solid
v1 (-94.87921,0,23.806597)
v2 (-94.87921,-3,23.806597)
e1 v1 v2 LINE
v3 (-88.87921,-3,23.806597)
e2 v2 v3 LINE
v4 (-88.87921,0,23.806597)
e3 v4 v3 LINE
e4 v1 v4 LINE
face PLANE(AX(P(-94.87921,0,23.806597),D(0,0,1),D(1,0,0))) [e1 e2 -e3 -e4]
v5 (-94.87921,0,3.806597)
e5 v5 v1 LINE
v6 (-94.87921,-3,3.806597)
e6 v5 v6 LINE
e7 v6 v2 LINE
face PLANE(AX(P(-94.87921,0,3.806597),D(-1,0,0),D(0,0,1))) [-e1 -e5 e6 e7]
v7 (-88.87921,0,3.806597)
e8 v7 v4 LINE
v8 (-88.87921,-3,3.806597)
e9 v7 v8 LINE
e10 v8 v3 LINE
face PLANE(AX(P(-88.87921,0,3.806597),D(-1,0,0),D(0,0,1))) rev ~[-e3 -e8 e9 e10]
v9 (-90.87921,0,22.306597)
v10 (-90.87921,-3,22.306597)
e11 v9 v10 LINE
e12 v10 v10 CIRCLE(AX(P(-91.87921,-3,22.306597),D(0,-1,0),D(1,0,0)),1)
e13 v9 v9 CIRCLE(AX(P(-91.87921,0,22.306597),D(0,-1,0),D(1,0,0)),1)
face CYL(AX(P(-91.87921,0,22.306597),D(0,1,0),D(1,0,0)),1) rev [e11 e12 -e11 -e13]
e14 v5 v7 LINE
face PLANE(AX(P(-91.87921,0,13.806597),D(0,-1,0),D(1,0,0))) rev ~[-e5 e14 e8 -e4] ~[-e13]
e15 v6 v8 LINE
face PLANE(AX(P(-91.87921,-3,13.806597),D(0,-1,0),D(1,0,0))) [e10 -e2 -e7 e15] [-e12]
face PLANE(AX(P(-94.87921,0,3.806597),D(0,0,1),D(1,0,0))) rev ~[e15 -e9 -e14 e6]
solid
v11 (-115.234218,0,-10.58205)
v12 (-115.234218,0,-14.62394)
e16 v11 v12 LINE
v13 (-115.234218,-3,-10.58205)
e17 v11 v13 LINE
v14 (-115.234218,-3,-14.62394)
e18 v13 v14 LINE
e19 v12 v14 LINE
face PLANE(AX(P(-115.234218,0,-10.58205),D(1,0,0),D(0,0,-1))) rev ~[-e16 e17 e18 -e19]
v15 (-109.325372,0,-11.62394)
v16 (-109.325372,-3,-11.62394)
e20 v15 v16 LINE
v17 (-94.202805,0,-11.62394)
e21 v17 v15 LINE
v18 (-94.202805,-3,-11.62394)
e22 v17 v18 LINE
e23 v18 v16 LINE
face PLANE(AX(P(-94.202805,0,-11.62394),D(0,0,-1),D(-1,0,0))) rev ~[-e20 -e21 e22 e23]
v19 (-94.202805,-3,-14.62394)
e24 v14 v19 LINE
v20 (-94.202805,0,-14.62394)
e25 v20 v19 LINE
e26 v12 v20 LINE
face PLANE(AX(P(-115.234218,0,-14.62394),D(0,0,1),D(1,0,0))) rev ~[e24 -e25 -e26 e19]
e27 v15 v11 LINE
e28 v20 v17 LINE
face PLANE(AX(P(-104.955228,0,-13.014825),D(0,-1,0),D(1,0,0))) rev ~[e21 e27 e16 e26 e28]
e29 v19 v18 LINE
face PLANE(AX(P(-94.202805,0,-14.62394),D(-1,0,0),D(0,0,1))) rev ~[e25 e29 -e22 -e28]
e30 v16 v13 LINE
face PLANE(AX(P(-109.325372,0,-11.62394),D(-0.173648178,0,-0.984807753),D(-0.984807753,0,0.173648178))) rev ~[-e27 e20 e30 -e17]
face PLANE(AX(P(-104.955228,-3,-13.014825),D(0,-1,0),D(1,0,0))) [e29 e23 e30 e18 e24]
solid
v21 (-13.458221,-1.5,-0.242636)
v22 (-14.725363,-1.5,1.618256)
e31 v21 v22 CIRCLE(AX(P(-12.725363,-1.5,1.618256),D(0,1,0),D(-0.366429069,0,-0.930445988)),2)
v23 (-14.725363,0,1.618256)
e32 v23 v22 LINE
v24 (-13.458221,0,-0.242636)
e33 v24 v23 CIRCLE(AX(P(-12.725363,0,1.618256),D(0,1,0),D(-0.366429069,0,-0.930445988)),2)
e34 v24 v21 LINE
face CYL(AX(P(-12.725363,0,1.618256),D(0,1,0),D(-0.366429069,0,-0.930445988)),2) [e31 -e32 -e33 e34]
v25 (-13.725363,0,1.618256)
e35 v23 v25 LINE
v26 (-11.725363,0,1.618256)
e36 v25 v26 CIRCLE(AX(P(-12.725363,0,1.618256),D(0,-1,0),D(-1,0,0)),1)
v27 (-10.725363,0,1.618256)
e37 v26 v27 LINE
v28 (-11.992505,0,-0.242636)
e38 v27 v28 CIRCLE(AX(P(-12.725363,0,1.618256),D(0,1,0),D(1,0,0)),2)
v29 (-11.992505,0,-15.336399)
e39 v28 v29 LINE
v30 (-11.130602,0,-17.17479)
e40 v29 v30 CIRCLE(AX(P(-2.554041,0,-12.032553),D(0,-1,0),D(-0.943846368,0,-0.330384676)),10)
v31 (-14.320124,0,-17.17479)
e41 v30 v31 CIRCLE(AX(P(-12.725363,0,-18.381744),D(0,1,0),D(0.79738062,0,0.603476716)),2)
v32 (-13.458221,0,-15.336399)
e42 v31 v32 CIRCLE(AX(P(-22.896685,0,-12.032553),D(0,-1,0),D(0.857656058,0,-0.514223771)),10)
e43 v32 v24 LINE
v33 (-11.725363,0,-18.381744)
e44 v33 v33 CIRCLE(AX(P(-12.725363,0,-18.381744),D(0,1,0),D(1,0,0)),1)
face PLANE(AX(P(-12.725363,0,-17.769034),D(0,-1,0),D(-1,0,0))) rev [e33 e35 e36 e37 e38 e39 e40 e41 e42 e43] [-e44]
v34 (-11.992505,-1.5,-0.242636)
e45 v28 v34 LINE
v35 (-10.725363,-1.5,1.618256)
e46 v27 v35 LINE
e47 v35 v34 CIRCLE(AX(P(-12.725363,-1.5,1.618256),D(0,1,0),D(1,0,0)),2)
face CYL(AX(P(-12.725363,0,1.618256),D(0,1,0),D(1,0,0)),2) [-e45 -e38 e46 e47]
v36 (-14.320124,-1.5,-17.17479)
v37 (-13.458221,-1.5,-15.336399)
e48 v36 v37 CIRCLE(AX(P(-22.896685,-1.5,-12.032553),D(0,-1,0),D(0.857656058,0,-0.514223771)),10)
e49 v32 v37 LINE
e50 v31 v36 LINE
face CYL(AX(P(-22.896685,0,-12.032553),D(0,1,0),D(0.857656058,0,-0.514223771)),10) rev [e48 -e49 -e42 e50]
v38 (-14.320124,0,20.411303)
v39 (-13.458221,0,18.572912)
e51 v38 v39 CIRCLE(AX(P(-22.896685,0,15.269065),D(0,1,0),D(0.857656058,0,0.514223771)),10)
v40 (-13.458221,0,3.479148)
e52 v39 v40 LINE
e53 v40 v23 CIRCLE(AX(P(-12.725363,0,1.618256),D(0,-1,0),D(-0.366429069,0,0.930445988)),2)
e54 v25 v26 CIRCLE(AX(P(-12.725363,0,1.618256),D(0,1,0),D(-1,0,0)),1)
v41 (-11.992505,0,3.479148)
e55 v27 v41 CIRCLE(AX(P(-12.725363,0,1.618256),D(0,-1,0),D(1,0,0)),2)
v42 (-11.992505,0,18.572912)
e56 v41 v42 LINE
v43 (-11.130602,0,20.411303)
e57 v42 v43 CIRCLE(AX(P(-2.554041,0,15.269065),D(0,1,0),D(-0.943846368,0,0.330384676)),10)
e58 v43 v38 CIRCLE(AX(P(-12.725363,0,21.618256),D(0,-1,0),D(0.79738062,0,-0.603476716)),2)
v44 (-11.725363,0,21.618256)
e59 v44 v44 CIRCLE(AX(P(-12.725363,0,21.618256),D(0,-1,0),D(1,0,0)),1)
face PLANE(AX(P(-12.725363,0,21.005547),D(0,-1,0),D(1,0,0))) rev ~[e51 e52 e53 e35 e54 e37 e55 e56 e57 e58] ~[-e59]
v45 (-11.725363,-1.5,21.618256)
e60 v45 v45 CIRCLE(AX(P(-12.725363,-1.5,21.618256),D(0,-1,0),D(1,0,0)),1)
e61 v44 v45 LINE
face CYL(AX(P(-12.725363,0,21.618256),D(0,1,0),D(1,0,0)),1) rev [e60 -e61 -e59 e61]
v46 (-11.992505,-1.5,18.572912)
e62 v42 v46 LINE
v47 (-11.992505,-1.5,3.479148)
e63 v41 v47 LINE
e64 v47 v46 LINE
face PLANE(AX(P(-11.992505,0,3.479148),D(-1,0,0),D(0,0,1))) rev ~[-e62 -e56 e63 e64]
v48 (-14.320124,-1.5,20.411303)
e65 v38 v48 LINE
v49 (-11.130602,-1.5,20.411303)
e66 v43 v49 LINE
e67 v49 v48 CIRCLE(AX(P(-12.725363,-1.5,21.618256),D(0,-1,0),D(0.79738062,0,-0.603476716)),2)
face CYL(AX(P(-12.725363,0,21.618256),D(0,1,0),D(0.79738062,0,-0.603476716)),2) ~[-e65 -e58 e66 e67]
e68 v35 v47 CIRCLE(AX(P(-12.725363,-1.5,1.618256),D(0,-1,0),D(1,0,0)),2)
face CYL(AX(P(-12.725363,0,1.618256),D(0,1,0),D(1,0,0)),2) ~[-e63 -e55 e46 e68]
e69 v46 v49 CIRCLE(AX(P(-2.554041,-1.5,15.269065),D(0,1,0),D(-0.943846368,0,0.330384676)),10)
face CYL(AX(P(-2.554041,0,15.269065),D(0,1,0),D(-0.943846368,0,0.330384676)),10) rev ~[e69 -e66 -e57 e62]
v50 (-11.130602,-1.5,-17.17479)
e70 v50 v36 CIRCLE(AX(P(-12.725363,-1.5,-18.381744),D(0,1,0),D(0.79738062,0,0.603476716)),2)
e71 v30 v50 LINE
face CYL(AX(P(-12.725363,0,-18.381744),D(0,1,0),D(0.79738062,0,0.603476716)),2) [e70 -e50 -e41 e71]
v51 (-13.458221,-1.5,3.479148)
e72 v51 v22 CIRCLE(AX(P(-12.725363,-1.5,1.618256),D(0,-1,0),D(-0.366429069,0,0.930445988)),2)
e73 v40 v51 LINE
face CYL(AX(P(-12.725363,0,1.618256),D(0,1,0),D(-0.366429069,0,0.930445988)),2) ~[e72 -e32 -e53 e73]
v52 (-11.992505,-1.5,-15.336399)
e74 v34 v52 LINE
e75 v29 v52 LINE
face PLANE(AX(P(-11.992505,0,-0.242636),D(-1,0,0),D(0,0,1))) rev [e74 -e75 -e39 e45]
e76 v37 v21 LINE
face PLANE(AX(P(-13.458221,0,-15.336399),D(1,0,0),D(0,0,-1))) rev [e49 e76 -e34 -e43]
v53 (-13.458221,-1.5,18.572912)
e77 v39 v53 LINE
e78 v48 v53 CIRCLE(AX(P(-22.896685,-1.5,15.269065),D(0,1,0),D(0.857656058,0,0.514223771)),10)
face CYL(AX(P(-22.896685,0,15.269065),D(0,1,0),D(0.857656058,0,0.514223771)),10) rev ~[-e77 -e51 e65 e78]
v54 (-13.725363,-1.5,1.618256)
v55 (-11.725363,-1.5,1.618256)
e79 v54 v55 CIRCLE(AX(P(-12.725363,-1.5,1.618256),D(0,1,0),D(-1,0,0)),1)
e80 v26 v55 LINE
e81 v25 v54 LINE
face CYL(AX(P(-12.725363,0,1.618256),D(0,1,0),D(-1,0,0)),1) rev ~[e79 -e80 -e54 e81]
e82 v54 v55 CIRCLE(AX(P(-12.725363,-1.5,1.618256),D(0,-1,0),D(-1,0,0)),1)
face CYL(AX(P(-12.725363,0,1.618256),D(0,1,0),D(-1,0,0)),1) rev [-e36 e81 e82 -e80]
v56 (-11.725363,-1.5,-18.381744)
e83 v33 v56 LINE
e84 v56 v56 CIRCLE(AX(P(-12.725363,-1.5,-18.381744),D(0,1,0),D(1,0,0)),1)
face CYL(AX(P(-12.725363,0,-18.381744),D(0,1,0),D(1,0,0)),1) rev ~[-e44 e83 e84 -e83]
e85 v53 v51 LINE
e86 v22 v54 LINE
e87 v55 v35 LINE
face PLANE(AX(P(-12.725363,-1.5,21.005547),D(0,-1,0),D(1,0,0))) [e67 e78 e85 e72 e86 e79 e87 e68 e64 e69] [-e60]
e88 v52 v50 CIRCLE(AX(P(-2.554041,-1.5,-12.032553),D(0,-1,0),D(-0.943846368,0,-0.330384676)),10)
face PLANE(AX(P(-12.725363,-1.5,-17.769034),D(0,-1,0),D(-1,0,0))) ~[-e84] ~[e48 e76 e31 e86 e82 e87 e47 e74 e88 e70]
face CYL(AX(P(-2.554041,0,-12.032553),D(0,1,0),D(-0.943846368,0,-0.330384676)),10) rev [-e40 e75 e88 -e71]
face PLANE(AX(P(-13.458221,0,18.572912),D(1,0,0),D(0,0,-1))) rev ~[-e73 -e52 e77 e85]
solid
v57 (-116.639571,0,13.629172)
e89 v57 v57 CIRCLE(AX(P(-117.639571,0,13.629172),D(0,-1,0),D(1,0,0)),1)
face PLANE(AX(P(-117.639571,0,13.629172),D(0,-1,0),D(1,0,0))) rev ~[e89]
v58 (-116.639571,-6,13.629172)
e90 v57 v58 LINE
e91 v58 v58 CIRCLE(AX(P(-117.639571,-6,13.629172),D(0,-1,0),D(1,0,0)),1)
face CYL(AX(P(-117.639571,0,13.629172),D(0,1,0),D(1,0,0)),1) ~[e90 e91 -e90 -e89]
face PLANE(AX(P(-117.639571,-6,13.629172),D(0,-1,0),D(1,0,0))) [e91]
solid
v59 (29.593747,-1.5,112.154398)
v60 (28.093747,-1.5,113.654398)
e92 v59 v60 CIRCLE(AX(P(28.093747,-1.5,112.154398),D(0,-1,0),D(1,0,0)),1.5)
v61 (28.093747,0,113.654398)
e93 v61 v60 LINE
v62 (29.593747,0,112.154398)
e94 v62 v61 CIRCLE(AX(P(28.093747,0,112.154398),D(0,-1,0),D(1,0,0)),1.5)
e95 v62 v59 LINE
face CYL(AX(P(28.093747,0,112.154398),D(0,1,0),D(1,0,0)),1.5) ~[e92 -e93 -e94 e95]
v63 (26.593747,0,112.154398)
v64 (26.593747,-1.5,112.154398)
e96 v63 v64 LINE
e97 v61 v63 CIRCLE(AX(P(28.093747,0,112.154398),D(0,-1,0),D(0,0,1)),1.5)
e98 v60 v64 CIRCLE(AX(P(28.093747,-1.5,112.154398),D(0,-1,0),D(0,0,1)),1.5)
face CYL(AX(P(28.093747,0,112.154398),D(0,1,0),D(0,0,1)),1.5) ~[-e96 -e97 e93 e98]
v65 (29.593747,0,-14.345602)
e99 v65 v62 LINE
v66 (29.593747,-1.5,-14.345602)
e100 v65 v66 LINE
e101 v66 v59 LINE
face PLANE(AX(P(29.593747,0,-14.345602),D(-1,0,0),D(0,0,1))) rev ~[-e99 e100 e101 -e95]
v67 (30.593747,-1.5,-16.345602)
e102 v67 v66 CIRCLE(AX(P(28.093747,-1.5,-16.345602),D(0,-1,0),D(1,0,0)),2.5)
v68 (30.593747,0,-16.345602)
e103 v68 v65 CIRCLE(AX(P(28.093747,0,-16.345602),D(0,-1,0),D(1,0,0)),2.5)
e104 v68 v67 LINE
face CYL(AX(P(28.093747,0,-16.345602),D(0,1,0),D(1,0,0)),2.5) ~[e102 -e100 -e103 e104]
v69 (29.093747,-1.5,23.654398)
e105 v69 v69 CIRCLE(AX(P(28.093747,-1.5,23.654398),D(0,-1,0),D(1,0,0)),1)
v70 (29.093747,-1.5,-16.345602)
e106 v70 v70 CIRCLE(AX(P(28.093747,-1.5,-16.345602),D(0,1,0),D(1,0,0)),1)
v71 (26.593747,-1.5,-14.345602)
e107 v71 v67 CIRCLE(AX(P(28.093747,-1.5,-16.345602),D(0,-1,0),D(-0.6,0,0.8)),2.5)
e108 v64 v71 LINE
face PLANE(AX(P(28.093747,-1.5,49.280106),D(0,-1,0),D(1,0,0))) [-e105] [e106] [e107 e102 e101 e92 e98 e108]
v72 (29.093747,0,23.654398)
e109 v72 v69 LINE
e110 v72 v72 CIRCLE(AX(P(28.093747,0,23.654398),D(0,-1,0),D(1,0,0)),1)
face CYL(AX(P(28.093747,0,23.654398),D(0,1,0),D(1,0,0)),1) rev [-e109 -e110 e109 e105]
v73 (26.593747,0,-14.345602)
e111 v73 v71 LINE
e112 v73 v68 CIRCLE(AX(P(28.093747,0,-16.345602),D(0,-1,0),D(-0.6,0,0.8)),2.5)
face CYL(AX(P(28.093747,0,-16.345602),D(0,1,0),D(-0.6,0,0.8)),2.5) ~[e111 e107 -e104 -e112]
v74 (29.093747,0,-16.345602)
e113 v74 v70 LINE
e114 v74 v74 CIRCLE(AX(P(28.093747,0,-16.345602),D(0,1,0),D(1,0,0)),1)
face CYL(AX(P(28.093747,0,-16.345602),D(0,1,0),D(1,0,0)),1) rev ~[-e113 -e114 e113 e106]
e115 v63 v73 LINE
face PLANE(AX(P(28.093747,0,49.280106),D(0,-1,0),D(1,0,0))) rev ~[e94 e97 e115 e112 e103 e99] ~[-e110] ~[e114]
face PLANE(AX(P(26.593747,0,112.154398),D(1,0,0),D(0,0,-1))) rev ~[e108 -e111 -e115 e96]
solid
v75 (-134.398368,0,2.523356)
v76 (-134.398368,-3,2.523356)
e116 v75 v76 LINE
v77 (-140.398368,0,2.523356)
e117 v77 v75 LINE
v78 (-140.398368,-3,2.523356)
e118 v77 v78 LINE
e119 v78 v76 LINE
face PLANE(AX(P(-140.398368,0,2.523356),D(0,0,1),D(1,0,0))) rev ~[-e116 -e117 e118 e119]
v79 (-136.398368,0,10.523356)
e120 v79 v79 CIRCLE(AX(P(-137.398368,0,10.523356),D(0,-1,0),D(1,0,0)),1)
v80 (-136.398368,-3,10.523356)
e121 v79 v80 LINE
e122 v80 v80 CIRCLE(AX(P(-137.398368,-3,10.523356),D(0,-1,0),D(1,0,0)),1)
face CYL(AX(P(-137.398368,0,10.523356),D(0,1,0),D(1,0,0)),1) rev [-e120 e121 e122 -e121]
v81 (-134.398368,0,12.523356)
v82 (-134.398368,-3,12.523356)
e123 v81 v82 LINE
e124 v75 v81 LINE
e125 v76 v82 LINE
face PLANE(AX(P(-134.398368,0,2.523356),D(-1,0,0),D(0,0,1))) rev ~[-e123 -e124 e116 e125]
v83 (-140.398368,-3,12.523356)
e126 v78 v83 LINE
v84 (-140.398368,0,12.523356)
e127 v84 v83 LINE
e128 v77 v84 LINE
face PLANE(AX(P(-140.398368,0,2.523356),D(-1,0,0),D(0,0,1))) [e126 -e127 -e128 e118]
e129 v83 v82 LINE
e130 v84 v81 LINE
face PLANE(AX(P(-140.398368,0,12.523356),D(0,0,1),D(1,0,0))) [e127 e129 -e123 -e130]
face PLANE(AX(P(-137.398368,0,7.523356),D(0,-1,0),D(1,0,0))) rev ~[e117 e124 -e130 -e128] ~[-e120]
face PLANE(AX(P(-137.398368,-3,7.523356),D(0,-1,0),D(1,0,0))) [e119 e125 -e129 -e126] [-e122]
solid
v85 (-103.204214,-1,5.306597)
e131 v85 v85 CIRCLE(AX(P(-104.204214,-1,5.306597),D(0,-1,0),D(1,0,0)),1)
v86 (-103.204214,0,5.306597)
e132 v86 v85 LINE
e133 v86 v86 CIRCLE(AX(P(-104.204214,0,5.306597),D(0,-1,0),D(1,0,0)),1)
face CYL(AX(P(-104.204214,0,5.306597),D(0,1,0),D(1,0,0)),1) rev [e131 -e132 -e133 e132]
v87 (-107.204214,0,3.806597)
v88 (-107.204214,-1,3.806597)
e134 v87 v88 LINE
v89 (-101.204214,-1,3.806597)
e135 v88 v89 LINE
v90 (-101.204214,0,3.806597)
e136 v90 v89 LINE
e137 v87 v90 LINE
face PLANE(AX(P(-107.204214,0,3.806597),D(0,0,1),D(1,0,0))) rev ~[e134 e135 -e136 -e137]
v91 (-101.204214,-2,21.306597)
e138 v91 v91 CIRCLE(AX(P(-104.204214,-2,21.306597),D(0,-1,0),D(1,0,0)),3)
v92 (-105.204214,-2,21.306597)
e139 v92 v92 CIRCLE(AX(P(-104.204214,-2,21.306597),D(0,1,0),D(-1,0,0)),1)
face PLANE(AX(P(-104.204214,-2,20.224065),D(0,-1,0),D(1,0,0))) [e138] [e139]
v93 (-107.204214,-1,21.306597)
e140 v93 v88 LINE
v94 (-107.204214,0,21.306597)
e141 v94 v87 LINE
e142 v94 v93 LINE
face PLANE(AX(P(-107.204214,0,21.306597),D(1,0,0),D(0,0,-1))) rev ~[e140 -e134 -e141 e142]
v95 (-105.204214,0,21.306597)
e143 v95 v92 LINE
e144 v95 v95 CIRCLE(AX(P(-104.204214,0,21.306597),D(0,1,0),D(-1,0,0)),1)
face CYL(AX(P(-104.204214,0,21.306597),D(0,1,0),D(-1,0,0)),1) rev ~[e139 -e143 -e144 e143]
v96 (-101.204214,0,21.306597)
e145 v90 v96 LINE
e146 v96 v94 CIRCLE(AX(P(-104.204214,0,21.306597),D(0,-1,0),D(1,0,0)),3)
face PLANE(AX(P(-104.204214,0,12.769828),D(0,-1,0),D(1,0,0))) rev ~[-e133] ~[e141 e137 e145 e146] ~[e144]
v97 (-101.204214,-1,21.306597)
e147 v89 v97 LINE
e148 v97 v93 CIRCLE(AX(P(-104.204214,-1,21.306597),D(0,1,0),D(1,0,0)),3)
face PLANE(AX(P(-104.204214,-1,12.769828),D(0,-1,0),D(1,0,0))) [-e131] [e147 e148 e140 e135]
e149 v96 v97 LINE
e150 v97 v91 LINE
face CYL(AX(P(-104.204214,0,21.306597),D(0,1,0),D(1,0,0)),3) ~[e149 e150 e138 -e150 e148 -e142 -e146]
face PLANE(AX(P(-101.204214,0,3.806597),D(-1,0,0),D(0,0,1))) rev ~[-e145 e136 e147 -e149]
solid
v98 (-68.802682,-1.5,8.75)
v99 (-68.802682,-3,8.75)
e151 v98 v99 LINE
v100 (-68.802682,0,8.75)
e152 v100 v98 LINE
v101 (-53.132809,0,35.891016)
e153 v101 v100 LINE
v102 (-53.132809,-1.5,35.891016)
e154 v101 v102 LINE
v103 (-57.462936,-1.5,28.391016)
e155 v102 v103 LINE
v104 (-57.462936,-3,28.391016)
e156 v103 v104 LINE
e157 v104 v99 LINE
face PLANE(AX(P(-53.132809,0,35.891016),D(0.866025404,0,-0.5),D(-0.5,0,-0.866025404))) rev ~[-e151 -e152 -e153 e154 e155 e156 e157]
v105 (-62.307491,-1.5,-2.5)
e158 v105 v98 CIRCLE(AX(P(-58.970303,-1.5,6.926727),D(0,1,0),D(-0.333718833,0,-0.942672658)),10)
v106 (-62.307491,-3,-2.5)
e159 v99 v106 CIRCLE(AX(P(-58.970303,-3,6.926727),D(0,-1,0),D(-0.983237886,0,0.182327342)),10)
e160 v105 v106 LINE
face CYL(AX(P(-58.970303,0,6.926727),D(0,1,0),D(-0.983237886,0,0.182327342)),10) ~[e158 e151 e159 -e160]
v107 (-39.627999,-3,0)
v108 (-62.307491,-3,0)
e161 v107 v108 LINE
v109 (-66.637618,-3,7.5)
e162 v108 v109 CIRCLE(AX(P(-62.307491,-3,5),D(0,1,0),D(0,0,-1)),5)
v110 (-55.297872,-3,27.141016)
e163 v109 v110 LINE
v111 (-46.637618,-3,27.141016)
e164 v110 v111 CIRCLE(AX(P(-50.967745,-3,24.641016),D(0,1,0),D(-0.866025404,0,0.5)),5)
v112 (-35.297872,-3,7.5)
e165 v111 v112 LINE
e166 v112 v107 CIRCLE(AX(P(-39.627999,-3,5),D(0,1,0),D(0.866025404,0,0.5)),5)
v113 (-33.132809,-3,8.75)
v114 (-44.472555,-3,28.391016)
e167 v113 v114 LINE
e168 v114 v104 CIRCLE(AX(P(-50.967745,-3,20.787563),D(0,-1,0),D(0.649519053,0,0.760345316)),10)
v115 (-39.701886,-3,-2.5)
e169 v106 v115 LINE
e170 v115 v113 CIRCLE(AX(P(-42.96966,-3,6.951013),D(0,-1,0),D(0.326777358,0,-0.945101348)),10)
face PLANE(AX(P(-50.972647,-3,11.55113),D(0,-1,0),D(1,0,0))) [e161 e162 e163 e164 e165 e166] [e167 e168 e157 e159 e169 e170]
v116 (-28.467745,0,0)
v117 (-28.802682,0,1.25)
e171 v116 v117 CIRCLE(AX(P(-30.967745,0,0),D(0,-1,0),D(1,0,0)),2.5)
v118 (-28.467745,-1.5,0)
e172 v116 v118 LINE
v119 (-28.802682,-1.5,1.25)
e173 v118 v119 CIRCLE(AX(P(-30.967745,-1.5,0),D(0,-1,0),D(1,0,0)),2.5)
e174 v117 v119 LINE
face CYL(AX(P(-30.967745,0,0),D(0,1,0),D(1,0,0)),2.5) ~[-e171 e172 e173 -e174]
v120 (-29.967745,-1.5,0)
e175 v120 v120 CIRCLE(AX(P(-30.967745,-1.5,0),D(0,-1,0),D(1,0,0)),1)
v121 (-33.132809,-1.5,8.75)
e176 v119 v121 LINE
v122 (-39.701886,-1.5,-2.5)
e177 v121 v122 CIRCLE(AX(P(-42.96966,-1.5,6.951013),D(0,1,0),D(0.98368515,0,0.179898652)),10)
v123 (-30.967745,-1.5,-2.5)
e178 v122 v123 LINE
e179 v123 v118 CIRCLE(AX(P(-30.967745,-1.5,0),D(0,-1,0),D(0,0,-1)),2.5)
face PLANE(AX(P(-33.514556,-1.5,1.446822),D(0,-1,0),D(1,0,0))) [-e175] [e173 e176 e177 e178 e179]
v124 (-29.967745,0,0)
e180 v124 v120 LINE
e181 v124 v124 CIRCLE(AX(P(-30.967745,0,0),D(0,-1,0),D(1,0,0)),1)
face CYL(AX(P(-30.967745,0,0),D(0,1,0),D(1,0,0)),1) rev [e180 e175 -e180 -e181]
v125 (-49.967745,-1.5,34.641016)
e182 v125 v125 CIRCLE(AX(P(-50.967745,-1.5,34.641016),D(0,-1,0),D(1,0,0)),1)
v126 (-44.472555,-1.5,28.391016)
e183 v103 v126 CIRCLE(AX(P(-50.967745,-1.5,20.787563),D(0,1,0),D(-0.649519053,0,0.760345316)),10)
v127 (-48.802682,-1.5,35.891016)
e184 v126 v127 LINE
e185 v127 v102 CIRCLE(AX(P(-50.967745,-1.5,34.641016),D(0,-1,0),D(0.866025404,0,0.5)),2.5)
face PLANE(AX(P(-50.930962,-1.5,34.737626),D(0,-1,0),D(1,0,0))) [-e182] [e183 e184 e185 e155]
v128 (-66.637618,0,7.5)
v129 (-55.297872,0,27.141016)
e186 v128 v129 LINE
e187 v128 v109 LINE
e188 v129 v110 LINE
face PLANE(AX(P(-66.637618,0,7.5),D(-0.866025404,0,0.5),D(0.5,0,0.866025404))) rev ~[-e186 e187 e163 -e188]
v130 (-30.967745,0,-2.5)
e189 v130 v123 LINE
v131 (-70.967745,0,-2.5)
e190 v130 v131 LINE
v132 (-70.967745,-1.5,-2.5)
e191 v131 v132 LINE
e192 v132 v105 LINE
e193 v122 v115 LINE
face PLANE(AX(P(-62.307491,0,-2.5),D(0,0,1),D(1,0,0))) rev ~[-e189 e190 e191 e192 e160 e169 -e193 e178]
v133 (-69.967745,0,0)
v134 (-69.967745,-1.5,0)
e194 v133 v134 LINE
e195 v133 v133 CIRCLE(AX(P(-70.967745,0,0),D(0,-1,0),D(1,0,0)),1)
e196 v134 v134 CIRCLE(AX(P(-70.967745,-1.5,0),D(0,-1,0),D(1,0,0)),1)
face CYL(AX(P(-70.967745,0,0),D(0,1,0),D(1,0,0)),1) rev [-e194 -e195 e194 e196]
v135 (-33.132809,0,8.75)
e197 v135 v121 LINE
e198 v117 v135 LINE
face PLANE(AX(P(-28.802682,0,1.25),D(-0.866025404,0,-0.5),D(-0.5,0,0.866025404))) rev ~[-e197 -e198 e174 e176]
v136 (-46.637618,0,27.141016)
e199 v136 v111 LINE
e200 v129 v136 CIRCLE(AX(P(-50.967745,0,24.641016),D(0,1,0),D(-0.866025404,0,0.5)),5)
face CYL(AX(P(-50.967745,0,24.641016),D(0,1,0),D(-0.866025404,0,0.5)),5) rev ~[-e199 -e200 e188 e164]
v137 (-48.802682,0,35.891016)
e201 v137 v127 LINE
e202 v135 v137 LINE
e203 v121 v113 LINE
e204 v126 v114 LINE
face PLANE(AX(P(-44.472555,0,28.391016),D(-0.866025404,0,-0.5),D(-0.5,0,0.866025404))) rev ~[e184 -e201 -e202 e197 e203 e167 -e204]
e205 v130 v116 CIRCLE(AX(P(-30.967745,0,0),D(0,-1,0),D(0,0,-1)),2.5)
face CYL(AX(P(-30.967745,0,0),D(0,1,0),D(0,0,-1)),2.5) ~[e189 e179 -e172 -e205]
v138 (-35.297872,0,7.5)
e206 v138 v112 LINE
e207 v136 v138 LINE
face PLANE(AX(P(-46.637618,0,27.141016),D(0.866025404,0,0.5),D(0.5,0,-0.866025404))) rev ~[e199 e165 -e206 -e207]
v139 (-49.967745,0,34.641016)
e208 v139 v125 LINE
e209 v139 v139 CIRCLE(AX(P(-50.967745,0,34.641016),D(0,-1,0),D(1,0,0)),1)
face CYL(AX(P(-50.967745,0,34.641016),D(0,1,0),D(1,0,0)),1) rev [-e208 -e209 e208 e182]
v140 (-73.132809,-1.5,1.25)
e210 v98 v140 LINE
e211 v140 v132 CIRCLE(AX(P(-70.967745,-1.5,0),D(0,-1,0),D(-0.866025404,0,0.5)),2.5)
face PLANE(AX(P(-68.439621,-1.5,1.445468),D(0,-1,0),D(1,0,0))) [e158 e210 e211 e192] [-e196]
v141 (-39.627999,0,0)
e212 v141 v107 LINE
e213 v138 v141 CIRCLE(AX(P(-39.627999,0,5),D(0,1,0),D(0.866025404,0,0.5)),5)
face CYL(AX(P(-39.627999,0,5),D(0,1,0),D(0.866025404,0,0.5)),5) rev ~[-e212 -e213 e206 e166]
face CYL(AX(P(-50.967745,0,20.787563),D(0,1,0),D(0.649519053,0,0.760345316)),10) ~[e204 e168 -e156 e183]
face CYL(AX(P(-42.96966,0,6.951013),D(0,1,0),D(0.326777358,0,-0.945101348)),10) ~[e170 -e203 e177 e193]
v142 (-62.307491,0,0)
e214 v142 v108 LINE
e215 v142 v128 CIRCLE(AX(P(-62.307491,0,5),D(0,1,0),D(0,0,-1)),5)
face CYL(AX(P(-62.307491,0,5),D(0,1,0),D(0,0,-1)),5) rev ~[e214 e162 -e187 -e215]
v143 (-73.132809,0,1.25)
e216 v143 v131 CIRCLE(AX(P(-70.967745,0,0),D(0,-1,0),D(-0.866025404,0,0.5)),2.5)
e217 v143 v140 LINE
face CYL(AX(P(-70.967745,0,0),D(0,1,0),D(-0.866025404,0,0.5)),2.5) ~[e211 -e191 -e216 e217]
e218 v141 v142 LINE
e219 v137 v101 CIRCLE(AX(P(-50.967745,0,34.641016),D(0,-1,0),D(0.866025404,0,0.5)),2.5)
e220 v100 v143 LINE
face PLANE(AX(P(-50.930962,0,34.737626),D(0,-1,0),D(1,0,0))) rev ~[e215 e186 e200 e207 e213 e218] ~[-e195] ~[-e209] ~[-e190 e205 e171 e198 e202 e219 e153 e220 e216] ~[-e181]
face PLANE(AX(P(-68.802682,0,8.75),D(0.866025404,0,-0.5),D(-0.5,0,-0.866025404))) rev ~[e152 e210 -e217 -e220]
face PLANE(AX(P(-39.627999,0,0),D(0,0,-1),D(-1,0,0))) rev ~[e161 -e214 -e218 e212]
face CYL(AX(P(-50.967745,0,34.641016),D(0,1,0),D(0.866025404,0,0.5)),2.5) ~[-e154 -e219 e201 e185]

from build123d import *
from build123d import SkipClean  # not in build123d's __all__

# Parameters (mm, degrees)
F1_DEPTH  = 3
F0_R      = 1
F2_DEPTH  = 1.5
F4_DEPTH  = 1.5
F3_R      = 1
F5_DEPTH  = 1.5
F7_W      = 6
F7_H      = 20
F7_R      = 1
F8_DEPTH  = 3
F9_DEPTH  = 6
F10_DEPTH = 2
F11_DEPTH = 1
F12_R     = 1
F13_DEPTH = 1.5
F7_H_2    = 10
F14_DEPTH = 3
F16_DEPTH = 3


with BuildPart() as f1:
    # F0 (on Front) → F1 (new body)
    with BuildSketch(Plane.XZ):
        with BuildLine():
            Line((-33.1328085528, 8.75), (-44.4725545149, 28.3910161514))
            ThreePointArc((-44.4725545149, 28.3910161514), (-50.9677450433, 30.7875629885), (-57.4629355717, 28.3910161514))
            Line((-57.4629355717, 28.3910161514), (-68.8026815338, 8.75))
            ThreePointArc((-68.8026815338, 8.75), (-67.630556712, 1.9267265814), (-62.3074910055, -2.5))
            Line((-62.3074910055, -2.5), (-39.7018864751, -2.5))
            ThreePointArc((-39.7018864751, -2.5), (-34.3340694771, 1.9085363771), (-33.1328085528, 8.75))
        make_face()
        with BuildLine():
            Line((-39.6279990812, 0), (-62.3074910055, 0))
            ThreePointArc((-62.3074910055, 0), (-66.6376180244, 2.5), (-66.6376180244, 7.5))
            Line((-66.6376180244, 7.5), (-55.2978720622, 27.1410161514))
            ThreePointArc((-55.2978720622, 27.1410161514), (-50.9677450433, 29.6410161514), (-46.6376180244, 27.1410161514))
            Line((-46.6376180244, 27.1410161514), (-35.2978720622, 7.5))
            ThreePointArc((-35.2978720622, 7.5), (-35.2978720622, 2.5), (-39.6279990812, 0))
        make_face(mode=Mode.SUBTRACT)
    extrude(amount=F1_DEPTH)

    # F0 (on Front) → F2 (join)
    with BuildSketch(Plane.XZ):
        with BuildLine():
            ThreePointArc((-53.1328085528, 35.8910161514), (-51.6147926561, 32.2262015857), (-48.4677450433, 34.6410161514))
            ThreePointArc((-48.4677450433, 34.6410161514), (-48.5529304776, 35.2880637641), (-48.8026815338, 35.8910161514))
            ThreePointArc((-48.8026815338, 35.8910161514), (-50.9677450433, 37.1410161514), (-53.1328085528, 35.8910161514))
        make_face()
        with Locations((-50.9677450433, 34.6410161514)):
            Circle(F0_R, mode=Mode.SUBTRACT)
        with BuildLine():
            ThreePointArc((-48.8026815338, 35.8910161514), (-48.5529304776, 35.2880637641), (-48.4677450433, 34.6410161514))
            ThreePointArc((-48.4677450433, 34.6410161514), (-51.6147926561, 32.2262015857), (-53.1328085528, 35.8910161514))
            Line((-53.1328085528, 35.8910161514), (-57.4629355717, 28.3910161514))
            ThreePointArc((-57.4629355717, 28.3910161514), (-50.9677450433, 30.7875629885), (-44.4725545149, 28.3910161514))
            Line((-44.4725545149, 28.3910161514), (-48.8026815338, 35.8910161514))
        make_face()
        with BuildLine():
            Line((-28.8026815338, 1.25), (-33.1328085528, 8.75))
            ThreePointArc((-33.1328085528, 8.75), (-34.3340694771, 1.9085363771), (-39.7018864751, -2.5))
            Line((-39.7018864751, -2.5), (-30.9677450433, -2.5))
            ThreePointArc((-30.9677450433, -2.5), (-33.1328085528, 1.25), (-28.8026815338, 1.25))
        make_face()
        with BuildLine():
            ThreePointArc((-28.4677450433, 0), (-28.5529304776, 0.6470476128), (-28.8026815338, 1.25))
            ThreePointArc((-28.8026815338, 1.25), (-33.1328085528, 1.25), (-30.9677450433, -2.5))
            ThreePointArc((-30.9677450433, -2.5), (-29.1999780903, -1.767766953), (-28.4677450433, 0))
        make_face()
        with Locations((-30.9677450433, 0)):
            Circle(F0_R, mode=Mode.SUBTRACT)
        with BuildLine():
            ThreePointArc((-62.3074910055, -2.5), (-67.630556712, 1.9267265814), (-68.8026815338, 8.75))
            Line((-68.8026815338, 8.75), (-73.1328085528, 1.25))
            ThreePointArc((-73.1328085528, 1.25), (-70.3206974306, 2.4148145657), (-68.4677450433, 0))
            ThreePointArc((-68.4677450433, 0), (-69.1999780903, -1.767766953), (-70.9677450433, -2.5))
            Line((-70.9677450433, -2.5), (-62.3074910055, -2.5))
        make_face()
        with BuildLine():
            ThreePointArc((-68.4677450433, 0), (-70.3206974306, 2.4148145657), (-73.1328085528, 1.25))
            ThreePointArc((-73.1328085528, 1.25), (-73.1328085528, -1.25), (-70.9677450433, -2.5))
            ThreePointArc((-70.9677450433, -2.5), (-69.1999780903, -1.767766953), (-68.4677450433, 0))
        make_face()
        with Locations((-70.9677450433, 0)):
            Circle(F0_R, mode=Mode.SUBTRACT)
    extrude(amount=F2_DEPTH)


with BuildPart() as f4:
    # F3 (on Front) → F4 (new body)
    with BuildSketch(Plane.XZ):
        with BuildLine():
            Line((-11.9925050726, 18.5729119312), (-13.4582213502, 18.5729119312))
            Line((-13.4582213502, 18.5729119312), (-13.4582213502, 3.4791482928))
            ThreePointArc((-13.4582213502, 3.4791482928), (-14.3784990615, 2.7439302749), (-14.7253632114, 1.6182563162))
            Line((-14.7253632114, 1.6182563162), (-13.7253632114, 1.6182563162))
            ThreePointArc((-13.7253632114, 1.6182563162), (-12.7253632114, 2.6182563162), (-11.7253632114, 1.6182563162))
            Line((-11.7253632114, 1.6182563162), (-10.7253632114, 1.6182563162))
            ThreePointArc((-10.7253632114, 1.6182563162), (-11.0722273613, 2.7439302749), (-11.9925050726, 3.4791482928))
            Line((-11.9925050726, 3.4791482928), (-11.9925050726, 18.5729119312))
        make_face()
    extrude(amount=F4_DEPTH)

    # F3 (on Front) → F5 (join)
    with BuildSketch(Plane.XZ):
        with BuildLine():
            ThreePointArc((-14.3201244522, 20.4113028852), (-13.8423935019, 19.5140392553), (-13.4582213502, 18.5729119312))
            Line((-13.4582213502, 18.5729119312), (-11.9925050726, 18.5729119312))
            ThreePointArc((-11.9925050726, 18.5729119312), (-11.6083329209, 19.5140392553), (-11.1306019706, 20.4113028852))
            ThreePointArc((-11.1306019706, 20.4113028852), (-12.7253632114, 23.6182563162), (-14.3201244522, 20.4113028852))
        make_face()
        with Locations((-12.7253632114, 21.6182563162)):
            Circle(F3_R, mode=Mode.SUBTRACT)
    extrude(amount=F5_DEPTH)

    # F6: F4 across face


with BuildPart() as f4_1:
    add(f4.part, clean=False)
    with SkipClean():  # cleaning this boolean's faces spoils the solid; the shape is the same uncleaned
        add(f4.part.mirror(Plane(origin=(-14.2253632114, -0.75, 1.6182563162), x_dir=(1, 0, 0), z_dir=(0, 0, -1))), clean=False)


with BuildPart() as f8:
    # F7 (on Front) → F8 (new body)
    with BuildSketch(Plane.XZ):
        with Locations((-91.8792099953, 13.8065970875)):
            Rectangle(F7_W, F7_H)
        with Locations((-91.8792099953, 22.3065970875)):
            Circle(F7_R, mode=Mode.SUBTRACT)
    extrude(amount=F8_DEPTH)


with BuildPart() as f9:
    # F7 (on Front) → F9 (new body)
    with BuildSketch(Plane.XZ):
        with Locations((-117.6395714283, 13.6291719973)):
            Circle(F7_R)
    extrude(amount=F9_DEPTH)


with BuildPart() as f10:
    # F7 (on Front) → F10 (new body)
    with BuildSketch(Plane.XZ):
        with BuildLine():
            ThreePointArc((-107.204214007, 21.3065970875), (-104.204214007, 18.3065970875), (-101.204214007, 21.3065970875))
            Line((-101.204214007, 21.3065970875), (-103.204214007, 21.3065970875))
            ThreePointArc((-103.204214007, 21.3065970875), (-104.204214007, 20.3065970875), (-105.204214007, 21.3065970875))
            Line((-105.204214007, 21.3065970875), (-107.204214007, 21.3065970875))
        make_face()
        with BuildLine():
            Line((-103.204214007, 21.3065970875), (-101.204214007, 21.3065970875))
            ThreePointArc((-101.204214007, 21.3065970875), (-104.204214007, 24.3065970875), (-107.204214007, 21.3065970875))
            Line((-107.204214007, 21.3065970875), (-105.204214007, 21.3065970875))
            ThreePointArc((-105.204214007, 21.3065970875), (-104.204214007, 22.3065970875), (-103.204214007, 21.3065970875))
        make_face()
    extrude(amount=F10_DEPTH)

    # F7 (on Front) → F11 (join)
    with BuildSketch(Plane.XZ):
        with BuildLine():
            Line((-101.204214007, 3.8065970875), (-101.204214007, 21.3065970875))
            ThreePointArc((-101.204214007, 21.3065970875), (-104.204214007, 18.3065970875), (-107.204214007, 21.3065970875))
            Line((-107.204214007, 21.3065970875), (-107.204214007, 3.8065970875))
            Line((-107.204214007, 3.8065970875), (-101.204214007, 3.8065970875))
        make_face()
        with Locations((-104.204214007, 5.3065970875)):
            Circle(F7_R, mode=Mode.SUBTRACT)
    extrude(amount=F11_DEPTH)


with BuildPart() as f13:
    # F12 (on Front) → F13 (new body)
    with BuildSketch(Plane.XZ):
        with BuildLine():
            ThreePointArc((26.5937472323, -14.345602423), (28.0937472323, -13.845602423), (29.5937472323, -14.345602423))
            Line((29.5937472323, -14.345602423), (29.5937472323, 112.154397577))
            ThreePointArc((29.5937472323, 112.154397577), (29.1544074041, 113.2150577488), (28.0937472323, 113.654397577))
            ThreePointArc((28.0937472323, 113.654397577), (27.0330870605, 113.2150577488), (26.5937472323, 112.154397577))
            Line((26.5937472323, 112.154397577), (26.5937472323, -14.345602423))
        make_face()
        with Locations((28.0937472323, 23.654397577)):
            Circle(F12_R, mode=Mode.SUBTRACT)
        with BuildLine():
            Line((29.5937472323, -14.345602423), (29.5937472323, -16.345602423))
            Line((29.5937472323, -16.345602423), (29.0937472323, -16.345602423))
            ThreePointArc((29.0937472323, -16.345602423), (28.0937472323, -17.345602423), (27.0937472323, -16.345602423))
            Line((27.0937472323, -16.345602423), (26.5937472323, -16.345602423))
            Line((26.5937472323, -16.345602423), (26.5937472323, -14.345602423))
            ThreePointArc((26.5937472323, -14.345602423), (26.9757132436, -18.5816704005), (30.5937472323, -16.345602423))
            ThreePointArc((30.5937472323, -16.345602423), (30.3298152098, -15.2275684342), (29.5937472323, -14.345602423))
        make_face()
        with BuildLine():
            Line((29.0937472323, -16.345602423), (29.5937472323, -16.345602423))
            Line((29.5937472323, -16.345602423), (29.5937472323, -14.345602423))
            ThreePointArc((29.5937472323, -14.345602423), (28.0937472323, -13.845602423), (26.5937472323, -14.345602423))
            Line((26.5937472323, -14.345602423), (26.5937472323, -16.345602423))
            Line((26.5937472323, -16.345602423), (27.0937472323, -16.345602423))
            ThreePointArc((27.0937472323, -16.345602423), (28.0937472323, -15.345602423), (29.0937472323, -16.345602423))
        make_face()
    extrude(amount=F13_DEPTH)


with BuildPart() as f14:
    # F7 (on Front) → F14 (new body)
    with BuildSketch(Plane.XZ):
        with Locations((-137.3983682394, 7.5233563501)):
            Rectangle(F7_W, F7_H_2)
        with Locations((-137.3983682394, 10.5233563501)):
            Circle(F7_R, mode=Mode.SUBTRACT)
    extrude(amount=F14_DEPTH)


with BuildPart() as f16:
    # F15 (on Front) → F16 (new body)
    with BuildSketch(Plane.XZ):
        Polygon((-94.2028054563, -11.6239395214), (-109.3253716573, -11.6239395214), (-115.2342181754, -10.5820504554), (-115.2342181754, -14.6239395214), (-109.2342181754, -14.6239395214), (-94.2028054563, -14.6239395214), align=None)
    extrude(amount=F16_DEPTH)


solid = Compound([f1.part, f4_1.part, f8.part, f9.part, f10.part, f13.part, f14.part, f16.part])
